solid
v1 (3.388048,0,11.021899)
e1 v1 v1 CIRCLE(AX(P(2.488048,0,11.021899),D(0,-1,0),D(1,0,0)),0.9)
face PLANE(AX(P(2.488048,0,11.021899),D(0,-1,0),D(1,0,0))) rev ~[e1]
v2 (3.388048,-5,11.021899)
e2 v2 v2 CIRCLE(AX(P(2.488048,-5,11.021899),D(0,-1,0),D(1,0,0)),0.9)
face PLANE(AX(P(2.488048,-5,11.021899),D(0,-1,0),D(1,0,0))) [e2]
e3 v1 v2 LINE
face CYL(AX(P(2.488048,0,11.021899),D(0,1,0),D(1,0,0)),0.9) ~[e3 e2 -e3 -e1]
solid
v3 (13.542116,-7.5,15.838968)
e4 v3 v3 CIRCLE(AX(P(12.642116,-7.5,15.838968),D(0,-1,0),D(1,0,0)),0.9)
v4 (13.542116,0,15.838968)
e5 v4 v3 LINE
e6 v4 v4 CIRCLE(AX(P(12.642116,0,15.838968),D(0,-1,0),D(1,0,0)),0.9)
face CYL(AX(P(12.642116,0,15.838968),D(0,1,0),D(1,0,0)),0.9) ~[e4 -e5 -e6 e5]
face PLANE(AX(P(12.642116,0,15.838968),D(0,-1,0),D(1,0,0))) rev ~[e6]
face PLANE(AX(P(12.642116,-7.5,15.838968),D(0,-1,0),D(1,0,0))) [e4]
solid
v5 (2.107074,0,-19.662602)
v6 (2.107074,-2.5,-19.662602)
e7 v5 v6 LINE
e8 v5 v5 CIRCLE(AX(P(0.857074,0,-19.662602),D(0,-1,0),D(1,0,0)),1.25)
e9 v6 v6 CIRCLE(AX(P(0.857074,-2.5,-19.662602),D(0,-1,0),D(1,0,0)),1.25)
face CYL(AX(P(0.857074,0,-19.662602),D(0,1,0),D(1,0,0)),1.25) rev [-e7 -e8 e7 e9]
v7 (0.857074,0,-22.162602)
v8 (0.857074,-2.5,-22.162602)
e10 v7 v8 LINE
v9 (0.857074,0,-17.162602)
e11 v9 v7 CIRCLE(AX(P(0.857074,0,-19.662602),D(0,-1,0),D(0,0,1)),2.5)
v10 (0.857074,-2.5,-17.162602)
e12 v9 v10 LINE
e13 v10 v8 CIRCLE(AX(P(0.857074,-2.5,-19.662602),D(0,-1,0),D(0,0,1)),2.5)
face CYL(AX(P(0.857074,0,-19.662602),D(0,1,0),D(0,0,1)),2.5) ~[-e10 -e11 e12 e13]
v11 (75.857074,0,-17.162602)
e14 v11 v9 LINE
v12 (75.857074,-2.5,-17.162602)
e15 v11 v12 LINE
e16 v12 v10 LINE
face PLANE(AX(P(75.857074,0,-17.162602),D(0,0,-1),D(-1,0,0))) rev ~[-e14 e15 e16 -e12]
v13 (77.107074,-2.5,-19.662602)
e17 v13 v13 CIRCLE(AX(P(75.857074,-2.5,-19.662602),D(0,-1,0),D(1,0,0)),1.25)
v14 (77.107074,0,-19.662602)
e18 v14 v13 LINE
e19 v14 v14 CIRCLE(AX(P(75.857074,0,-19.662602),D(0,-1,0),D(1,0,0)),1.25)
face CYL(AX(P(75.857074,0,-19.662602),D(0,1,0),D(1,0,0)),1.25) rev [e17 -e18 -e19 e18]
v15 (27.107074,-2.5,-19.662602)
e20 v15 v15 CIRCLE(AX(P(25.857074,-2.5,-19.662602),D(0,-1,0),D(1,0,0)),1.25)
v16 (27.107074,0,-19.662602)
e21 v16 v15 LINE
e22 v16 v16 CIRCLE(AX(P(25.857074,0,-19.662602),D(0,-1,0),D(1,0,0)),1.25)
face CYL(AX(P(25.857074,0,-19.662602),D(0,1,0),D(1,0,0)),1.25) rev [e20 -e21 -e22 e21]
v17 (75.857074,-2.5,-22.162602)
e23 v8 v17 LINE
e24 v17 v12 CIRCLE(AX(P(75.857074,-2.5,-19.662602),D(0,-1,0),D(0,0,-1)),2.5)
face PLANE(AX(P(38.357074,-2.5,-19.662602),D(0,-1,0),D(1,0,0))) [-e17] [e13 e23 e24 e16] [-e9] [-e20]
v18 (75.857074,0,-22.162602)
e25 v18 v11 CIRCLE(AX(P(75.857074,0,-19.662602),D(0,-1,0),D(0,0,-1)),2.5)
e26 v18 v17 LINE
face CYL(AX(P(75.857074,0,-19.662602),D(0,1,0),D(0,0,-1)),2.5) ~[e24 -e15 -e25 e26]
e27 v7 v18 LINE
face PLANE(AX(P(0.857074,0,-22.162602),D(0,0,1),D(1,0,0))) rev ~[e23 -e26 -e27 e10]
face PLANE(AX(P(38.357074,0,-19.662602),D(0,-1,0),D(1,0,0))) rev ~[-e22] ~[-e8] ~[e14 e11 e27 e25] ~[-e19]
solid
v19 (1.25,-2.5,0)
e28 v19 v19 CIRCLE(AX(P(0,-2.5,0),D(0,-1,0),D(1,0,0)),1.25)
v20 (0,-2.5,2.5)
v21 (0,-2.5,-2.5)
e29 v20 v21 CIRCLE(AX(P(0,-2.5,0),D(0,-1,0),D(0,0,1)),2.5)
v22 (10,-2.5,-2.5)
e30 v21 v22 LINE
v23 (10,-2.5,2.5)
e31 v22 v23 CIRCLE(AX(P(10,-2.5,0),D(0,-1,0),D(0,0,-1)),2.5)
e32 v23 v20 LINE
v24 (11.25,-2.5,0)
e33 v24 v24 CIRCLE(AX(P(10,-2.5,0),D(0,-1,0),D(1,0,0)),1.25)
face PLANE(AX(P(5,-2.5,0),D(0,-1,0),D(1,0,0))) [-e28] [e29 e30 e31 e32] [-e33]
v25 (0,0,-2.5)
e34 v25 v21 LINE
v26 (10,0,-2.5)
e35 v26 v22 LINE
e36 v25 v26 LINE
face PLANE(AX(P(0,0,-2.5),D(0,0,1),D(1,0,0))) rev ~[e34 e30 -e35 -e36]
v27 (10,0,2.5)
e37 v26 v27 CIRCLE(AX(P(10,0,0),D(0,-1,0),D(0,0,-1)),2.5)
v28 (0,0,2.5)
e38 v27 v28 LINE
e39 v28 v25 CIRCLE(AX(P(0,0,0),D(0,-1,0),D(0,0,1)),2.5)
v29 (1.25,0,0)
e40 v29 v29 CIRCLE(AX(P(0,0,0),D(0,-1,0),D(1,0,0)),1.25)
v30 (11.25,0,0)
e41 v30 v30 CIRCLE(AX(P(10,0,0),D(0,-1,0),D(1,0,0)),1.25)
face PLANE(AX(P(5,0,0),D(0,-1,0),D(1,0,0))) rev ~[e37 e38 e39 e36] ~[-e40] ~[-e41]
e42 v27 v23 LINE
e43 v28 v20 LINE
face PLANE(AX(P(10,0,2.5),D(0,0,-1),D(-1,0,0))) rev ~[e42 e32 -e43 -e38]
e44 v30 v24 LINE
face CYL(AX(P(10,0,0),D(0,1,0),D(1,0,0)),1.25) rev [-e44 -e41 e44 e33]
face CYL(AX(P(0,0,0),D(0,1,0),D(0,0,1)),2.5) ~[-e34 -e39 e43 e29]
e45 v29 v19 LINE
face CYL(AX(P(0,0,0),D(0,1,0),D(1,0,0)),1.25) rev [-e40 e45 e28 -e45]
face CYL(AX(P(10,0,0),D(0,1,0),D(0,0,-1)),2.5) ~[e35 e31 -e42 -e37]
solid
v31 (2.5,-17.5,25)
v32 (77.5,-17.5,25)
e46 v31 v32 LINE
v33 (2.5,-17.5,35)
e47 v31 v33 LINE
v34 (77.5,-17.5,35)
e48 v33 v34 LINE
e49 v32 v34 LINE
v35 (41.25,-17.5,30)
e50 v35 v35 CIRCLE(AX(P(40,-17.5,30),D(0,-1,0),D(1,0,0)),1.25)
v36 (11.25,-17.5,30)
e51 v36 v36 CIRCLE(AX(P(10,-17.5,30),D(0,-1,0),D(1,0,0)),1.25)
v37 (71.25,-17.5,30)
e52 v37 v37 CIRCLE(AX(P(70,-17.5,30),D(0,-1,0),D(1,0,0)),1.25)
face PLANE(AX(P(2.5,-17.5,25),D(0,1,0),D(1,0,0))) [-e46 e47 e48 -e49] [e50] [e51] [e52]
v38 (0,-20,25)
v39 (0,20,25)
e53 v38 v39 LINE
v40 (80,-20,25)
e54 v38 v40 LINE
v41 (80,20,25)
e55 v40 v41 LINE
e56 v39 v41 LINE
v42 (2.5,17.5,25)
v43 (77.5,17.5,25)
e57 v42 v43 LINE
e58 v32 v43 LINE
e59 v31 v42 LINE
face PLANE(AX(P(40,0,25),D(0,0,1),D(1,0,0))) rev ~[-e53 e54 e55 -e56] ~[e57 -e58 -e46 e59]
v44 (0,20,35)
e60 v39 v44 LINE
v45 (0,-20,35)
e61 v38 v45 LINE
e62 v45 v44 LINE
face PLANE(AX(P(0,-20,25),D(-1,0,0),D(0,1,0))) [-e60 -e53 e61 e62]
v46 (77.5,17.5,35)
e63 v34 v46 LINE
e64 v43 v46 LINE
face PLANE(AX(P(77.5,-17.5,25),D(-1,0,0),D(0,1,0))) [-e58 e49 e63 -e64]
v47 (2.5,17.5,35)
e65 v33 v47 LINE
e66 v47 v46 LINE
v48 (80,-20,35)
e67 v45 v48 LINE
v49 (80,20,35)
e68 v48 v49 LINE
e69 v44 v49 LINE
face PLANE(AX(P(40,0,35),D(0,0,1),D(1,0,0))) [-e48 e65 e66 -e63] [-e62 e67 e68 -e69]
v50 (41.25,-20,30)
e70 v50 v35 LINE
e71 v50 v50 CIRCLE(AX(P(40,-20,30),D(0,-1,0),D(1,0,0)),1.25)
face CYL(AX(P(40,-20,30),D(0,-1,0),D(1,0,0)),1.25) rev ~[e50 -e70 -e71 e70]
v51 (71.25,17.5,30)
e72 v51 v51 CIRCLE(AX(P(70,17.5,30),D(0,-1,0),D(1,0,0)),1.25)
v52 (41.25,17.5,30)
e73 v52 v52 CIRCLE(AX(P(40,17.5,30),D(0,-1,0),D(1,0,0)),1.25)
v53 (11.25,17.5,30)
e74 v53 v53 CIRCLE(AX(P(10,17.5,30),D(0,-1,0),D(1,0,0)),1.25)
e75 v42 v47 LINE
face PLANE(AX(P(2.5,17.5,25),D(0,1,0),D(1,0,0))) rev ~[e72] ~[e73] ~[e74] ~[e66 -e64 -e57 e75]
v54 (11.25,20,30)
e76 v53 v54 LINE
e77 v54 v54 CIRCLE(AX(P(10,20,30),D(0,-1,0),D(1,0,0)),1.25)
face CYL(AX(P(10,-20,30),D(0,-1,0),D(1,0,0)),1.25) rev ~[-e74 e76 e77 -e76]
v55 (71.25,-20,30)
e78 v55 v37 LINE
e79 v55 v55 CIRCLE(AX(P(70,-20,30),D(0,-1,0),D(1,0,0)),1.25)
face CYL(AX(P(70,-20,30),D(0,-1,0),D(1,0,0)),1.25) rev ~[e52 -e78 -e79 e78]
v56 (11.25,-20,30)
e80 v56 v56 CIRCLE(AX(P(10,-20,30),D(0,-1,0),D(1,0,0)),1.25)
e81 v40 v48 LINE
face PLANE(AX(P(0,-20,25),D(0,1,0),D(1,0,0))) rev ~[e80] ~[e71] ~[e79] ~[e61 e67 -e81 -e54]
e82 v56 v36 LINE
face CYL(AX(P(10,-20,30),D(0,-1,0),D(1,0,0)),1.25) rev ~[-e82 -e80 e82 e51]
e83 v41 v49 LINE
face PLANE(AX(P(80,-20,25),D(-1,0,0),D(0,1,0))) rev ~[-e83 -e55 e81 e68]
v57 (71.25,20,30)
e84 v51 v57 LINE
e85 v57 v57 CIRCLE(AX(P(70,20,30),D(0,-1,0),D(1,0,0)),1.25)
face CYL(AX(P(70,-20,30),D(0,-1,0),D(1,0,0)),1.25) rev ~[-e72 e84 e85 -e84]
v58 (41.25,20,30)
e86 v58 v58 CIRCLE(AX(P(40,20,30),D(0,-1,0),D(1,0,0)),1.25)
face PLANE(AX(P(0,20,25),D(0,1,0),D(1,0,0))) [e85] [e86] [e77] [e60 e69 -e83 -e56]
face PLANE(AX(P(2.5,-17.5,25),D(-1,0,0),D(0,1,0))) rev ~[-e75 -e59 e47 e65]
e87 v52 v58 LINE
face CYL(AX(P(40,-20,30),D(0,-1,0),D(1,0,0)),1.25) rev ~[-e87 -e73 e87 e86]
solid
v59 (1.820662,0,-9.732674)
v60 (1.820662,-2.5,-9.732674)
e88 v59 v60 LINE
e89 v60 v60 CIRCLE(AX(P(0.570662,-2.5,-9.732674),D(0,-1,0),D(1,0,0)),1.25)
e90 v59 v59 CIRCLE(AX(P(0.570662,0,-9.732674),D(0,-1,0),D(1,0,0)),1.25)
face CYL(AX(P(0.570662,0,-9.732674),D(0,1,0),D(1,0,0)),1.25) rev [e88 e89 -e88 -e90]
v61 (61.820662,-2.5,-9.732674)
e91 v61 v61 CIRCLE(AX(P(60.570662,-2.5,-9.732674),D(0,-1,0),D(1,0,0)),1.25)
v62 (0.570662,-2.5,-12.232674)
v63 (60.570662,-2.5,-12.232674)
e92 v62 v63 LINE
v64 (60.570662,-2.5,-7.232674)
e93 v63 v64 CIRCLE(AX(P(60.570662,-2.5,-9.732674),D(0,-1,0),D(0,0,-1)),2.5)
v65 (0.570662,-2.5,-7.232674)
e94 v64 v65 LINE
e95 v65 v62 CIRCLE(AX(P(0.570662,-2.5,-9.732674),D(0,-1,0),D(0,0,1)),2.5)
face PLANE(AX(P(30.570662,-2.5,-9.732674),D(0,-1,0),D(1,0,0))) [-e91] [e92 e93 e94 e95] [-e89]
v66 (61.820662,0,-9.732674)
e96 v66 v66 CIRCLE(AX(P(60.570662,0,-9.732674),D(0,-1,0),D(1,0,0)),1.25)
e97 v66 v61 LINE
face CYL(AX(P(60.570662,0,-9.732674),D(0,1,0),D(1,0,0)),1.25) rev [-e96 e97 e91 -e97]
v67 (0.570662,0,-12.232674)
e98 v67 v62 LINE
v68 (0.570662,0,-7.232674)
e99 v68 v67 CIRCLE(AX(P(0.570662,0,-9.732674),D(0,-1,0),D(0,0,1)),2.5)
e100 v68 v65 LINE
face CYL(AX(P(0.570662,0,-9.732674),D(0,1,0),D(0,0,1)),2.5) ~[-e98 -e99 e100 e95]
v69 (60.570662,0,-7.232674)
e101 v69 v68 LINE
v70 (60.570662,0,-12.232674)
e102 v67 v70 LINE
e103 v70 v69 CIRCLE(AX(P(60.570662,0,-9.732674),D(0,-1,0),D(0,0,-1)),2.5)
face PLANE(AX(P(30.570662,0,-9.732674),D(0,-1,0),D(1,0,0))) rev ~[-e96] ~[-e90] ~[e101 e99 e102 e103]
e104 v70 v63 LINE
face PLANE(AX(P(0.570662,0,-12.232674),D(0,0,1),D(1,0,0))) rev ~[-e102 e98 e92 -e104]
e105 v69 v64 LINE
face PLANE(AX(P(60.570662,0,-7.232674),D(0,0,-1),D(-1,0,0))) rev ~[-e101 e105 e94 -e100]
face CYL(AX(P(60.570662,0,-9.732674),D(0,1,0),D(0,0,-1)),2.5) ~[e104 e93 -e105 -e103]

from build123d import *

# Parameters (mm, degrees)
F1_R      = 1.25
F2_DEPTH  = 2.5
F3_R      = 1.25
F4_DEPTH  = 2.5
F5_R      = 1.25
F6_DEPTH  = 2.5
F8_W      = 80
F8_H      = 40
F8_W_2    = 75
F8_H_2    = 35
F9_DEPTH  = 10
F10_R     = 1.25
F11_DEPTH = 40.001
F12_R     = 0.9
F13_DEPTH = 5
F14_R     = 0.9
F15_DEPTH = 7.5


with BuildPart() as f2:
    # F1 (on Front) → F2 (new body)
    with BuildSketch(Plane.XZ):
        with BuildLine():
            Line((10, 2.5), (0, 2.5))
            ThreePointArc((0, 2.5), (-2.5, 0), (0, -2.5))
            Line((0, -2.5), (10, -2.5))
            ThreePointArc((10, -2.5), (12.5, 0), (10, 2.5))
        make_face()
        Circle(F1_R, mode=Mode.SUBTRACT)
        with Locations((10, 0)):
            Circle(F1_R, mode=Mode.SUBTRACT)
    extrude(amount=F2_DEPTH)


with BuildPart() as f4:
    # F3 (on Front) → F4 (new body)
    with BuildSketch(Plane.XZ):
        with BuildLine():
            Line((60.5706622079, -7.232673876), (0.5706622079, -7.232673876))
            ThreePointArc((0.5706622079, -7.232673876), (-1.9293377921, -9.732673876), (0.5706622079, -12.232673876))
            Line((0.5706622079, -12.232673876), (60.5706622079, -12.232673876))
            ThreePointArc((60.5706622079, -12.232673876), (63.0706622079, -9.732673876), (60.5706622079, -7.232673876))
        make_face()
        with Locations((0.5706622079, -9.732673876)):
            Circle(F3_R, mode=Mode.SUBTRACT)
        with Locations((60.5706622079, -9.732673876)):
            Circle(F3_R, mode=Mode.SUBTRACT)
    extrude(amount=F4_DEPTH)


with BuildPart() as f6:
    # F5 (on Front) → F6 (new body)
    with BuildSketch(Plane.XZ):
        with BuildLine():
            Line((75.8570737601, -17.1626018733), (0.8570737601, -17.1626018733))
            ThreePointArc((0.8570737601, -17.1626018733), (-1.6429262399, -19.6626018733), (0.8570737601, -22.1626018733))
            Line((0.8570737601, -22.1626018733), (75.8570737601, -22.1626018733))
            ThreePointArc((75.8570737601, -22.1626018733), (78.3570737601, -19.6626018733), (75.8570737601, -17.1626018733))
        make_face()
        with Locations((0.8570737601, -19.6626018733)):
            Circle(F5_R, mode=Mode.SUBTRACT)
        with Locations((25.8570737601, -19.6626018733)):
            Circle(F5_R, mode=Mode.SUBTRACT)
        with Locations((75.8570737601, -19.6626018733)):
            Circle(F5_R, mode=Mode.SUBTRACT)
    extrude(amount=F6_DEPTH)


with BuildPart() as f9:
    # F8 (on offset) → F9 (new body)
    with BuildSketch(Plane.XY.offset(25)):
        with Locations((40, 0)):
            Rectangle(F8_W, F8_H)
        with Locations((40, 0)):
            Rectangle(F8_W_2, F8_H_2, mode=Mode.SUBTRACT)
    extrude(amount=F9_DEPTH)

    # F10 (on face) → F11 (cut, through all)
    with BuildSketch(Plane.XZ.offset(20)):
        with Locations((10, 30)):
            Circle(F10_R)
        with Locations((70, 30)):
            Circle(F10_R)
        with Locations((40, 30)):
            Circle(F10_R)
    extrude(amount=-F11_DEPTH, mode=Mode.SUBTRACT)


with BuildPart() as f13:
    # F12 (on Front) → F13 (new body)
    with BuildSketch(Plane.XZ):
        with Locations((2.488047583, 11.0218990594)):
            Circle(F12_R)
    extrude(amount=F13_DEPTH)


with BuildPart() as f15:
    # F14 (on Front) → F15 (new body)
    with BuildSketch(Plane.XZ):
        with Locations((12.6421162859, 15.8389676362)):
            Circle(F14_R)
    extrude(amount=F15_DEPTH)


solid = Compound([f2.part, f4.part, f6.part, f9.part, f13.part, f15.part])
